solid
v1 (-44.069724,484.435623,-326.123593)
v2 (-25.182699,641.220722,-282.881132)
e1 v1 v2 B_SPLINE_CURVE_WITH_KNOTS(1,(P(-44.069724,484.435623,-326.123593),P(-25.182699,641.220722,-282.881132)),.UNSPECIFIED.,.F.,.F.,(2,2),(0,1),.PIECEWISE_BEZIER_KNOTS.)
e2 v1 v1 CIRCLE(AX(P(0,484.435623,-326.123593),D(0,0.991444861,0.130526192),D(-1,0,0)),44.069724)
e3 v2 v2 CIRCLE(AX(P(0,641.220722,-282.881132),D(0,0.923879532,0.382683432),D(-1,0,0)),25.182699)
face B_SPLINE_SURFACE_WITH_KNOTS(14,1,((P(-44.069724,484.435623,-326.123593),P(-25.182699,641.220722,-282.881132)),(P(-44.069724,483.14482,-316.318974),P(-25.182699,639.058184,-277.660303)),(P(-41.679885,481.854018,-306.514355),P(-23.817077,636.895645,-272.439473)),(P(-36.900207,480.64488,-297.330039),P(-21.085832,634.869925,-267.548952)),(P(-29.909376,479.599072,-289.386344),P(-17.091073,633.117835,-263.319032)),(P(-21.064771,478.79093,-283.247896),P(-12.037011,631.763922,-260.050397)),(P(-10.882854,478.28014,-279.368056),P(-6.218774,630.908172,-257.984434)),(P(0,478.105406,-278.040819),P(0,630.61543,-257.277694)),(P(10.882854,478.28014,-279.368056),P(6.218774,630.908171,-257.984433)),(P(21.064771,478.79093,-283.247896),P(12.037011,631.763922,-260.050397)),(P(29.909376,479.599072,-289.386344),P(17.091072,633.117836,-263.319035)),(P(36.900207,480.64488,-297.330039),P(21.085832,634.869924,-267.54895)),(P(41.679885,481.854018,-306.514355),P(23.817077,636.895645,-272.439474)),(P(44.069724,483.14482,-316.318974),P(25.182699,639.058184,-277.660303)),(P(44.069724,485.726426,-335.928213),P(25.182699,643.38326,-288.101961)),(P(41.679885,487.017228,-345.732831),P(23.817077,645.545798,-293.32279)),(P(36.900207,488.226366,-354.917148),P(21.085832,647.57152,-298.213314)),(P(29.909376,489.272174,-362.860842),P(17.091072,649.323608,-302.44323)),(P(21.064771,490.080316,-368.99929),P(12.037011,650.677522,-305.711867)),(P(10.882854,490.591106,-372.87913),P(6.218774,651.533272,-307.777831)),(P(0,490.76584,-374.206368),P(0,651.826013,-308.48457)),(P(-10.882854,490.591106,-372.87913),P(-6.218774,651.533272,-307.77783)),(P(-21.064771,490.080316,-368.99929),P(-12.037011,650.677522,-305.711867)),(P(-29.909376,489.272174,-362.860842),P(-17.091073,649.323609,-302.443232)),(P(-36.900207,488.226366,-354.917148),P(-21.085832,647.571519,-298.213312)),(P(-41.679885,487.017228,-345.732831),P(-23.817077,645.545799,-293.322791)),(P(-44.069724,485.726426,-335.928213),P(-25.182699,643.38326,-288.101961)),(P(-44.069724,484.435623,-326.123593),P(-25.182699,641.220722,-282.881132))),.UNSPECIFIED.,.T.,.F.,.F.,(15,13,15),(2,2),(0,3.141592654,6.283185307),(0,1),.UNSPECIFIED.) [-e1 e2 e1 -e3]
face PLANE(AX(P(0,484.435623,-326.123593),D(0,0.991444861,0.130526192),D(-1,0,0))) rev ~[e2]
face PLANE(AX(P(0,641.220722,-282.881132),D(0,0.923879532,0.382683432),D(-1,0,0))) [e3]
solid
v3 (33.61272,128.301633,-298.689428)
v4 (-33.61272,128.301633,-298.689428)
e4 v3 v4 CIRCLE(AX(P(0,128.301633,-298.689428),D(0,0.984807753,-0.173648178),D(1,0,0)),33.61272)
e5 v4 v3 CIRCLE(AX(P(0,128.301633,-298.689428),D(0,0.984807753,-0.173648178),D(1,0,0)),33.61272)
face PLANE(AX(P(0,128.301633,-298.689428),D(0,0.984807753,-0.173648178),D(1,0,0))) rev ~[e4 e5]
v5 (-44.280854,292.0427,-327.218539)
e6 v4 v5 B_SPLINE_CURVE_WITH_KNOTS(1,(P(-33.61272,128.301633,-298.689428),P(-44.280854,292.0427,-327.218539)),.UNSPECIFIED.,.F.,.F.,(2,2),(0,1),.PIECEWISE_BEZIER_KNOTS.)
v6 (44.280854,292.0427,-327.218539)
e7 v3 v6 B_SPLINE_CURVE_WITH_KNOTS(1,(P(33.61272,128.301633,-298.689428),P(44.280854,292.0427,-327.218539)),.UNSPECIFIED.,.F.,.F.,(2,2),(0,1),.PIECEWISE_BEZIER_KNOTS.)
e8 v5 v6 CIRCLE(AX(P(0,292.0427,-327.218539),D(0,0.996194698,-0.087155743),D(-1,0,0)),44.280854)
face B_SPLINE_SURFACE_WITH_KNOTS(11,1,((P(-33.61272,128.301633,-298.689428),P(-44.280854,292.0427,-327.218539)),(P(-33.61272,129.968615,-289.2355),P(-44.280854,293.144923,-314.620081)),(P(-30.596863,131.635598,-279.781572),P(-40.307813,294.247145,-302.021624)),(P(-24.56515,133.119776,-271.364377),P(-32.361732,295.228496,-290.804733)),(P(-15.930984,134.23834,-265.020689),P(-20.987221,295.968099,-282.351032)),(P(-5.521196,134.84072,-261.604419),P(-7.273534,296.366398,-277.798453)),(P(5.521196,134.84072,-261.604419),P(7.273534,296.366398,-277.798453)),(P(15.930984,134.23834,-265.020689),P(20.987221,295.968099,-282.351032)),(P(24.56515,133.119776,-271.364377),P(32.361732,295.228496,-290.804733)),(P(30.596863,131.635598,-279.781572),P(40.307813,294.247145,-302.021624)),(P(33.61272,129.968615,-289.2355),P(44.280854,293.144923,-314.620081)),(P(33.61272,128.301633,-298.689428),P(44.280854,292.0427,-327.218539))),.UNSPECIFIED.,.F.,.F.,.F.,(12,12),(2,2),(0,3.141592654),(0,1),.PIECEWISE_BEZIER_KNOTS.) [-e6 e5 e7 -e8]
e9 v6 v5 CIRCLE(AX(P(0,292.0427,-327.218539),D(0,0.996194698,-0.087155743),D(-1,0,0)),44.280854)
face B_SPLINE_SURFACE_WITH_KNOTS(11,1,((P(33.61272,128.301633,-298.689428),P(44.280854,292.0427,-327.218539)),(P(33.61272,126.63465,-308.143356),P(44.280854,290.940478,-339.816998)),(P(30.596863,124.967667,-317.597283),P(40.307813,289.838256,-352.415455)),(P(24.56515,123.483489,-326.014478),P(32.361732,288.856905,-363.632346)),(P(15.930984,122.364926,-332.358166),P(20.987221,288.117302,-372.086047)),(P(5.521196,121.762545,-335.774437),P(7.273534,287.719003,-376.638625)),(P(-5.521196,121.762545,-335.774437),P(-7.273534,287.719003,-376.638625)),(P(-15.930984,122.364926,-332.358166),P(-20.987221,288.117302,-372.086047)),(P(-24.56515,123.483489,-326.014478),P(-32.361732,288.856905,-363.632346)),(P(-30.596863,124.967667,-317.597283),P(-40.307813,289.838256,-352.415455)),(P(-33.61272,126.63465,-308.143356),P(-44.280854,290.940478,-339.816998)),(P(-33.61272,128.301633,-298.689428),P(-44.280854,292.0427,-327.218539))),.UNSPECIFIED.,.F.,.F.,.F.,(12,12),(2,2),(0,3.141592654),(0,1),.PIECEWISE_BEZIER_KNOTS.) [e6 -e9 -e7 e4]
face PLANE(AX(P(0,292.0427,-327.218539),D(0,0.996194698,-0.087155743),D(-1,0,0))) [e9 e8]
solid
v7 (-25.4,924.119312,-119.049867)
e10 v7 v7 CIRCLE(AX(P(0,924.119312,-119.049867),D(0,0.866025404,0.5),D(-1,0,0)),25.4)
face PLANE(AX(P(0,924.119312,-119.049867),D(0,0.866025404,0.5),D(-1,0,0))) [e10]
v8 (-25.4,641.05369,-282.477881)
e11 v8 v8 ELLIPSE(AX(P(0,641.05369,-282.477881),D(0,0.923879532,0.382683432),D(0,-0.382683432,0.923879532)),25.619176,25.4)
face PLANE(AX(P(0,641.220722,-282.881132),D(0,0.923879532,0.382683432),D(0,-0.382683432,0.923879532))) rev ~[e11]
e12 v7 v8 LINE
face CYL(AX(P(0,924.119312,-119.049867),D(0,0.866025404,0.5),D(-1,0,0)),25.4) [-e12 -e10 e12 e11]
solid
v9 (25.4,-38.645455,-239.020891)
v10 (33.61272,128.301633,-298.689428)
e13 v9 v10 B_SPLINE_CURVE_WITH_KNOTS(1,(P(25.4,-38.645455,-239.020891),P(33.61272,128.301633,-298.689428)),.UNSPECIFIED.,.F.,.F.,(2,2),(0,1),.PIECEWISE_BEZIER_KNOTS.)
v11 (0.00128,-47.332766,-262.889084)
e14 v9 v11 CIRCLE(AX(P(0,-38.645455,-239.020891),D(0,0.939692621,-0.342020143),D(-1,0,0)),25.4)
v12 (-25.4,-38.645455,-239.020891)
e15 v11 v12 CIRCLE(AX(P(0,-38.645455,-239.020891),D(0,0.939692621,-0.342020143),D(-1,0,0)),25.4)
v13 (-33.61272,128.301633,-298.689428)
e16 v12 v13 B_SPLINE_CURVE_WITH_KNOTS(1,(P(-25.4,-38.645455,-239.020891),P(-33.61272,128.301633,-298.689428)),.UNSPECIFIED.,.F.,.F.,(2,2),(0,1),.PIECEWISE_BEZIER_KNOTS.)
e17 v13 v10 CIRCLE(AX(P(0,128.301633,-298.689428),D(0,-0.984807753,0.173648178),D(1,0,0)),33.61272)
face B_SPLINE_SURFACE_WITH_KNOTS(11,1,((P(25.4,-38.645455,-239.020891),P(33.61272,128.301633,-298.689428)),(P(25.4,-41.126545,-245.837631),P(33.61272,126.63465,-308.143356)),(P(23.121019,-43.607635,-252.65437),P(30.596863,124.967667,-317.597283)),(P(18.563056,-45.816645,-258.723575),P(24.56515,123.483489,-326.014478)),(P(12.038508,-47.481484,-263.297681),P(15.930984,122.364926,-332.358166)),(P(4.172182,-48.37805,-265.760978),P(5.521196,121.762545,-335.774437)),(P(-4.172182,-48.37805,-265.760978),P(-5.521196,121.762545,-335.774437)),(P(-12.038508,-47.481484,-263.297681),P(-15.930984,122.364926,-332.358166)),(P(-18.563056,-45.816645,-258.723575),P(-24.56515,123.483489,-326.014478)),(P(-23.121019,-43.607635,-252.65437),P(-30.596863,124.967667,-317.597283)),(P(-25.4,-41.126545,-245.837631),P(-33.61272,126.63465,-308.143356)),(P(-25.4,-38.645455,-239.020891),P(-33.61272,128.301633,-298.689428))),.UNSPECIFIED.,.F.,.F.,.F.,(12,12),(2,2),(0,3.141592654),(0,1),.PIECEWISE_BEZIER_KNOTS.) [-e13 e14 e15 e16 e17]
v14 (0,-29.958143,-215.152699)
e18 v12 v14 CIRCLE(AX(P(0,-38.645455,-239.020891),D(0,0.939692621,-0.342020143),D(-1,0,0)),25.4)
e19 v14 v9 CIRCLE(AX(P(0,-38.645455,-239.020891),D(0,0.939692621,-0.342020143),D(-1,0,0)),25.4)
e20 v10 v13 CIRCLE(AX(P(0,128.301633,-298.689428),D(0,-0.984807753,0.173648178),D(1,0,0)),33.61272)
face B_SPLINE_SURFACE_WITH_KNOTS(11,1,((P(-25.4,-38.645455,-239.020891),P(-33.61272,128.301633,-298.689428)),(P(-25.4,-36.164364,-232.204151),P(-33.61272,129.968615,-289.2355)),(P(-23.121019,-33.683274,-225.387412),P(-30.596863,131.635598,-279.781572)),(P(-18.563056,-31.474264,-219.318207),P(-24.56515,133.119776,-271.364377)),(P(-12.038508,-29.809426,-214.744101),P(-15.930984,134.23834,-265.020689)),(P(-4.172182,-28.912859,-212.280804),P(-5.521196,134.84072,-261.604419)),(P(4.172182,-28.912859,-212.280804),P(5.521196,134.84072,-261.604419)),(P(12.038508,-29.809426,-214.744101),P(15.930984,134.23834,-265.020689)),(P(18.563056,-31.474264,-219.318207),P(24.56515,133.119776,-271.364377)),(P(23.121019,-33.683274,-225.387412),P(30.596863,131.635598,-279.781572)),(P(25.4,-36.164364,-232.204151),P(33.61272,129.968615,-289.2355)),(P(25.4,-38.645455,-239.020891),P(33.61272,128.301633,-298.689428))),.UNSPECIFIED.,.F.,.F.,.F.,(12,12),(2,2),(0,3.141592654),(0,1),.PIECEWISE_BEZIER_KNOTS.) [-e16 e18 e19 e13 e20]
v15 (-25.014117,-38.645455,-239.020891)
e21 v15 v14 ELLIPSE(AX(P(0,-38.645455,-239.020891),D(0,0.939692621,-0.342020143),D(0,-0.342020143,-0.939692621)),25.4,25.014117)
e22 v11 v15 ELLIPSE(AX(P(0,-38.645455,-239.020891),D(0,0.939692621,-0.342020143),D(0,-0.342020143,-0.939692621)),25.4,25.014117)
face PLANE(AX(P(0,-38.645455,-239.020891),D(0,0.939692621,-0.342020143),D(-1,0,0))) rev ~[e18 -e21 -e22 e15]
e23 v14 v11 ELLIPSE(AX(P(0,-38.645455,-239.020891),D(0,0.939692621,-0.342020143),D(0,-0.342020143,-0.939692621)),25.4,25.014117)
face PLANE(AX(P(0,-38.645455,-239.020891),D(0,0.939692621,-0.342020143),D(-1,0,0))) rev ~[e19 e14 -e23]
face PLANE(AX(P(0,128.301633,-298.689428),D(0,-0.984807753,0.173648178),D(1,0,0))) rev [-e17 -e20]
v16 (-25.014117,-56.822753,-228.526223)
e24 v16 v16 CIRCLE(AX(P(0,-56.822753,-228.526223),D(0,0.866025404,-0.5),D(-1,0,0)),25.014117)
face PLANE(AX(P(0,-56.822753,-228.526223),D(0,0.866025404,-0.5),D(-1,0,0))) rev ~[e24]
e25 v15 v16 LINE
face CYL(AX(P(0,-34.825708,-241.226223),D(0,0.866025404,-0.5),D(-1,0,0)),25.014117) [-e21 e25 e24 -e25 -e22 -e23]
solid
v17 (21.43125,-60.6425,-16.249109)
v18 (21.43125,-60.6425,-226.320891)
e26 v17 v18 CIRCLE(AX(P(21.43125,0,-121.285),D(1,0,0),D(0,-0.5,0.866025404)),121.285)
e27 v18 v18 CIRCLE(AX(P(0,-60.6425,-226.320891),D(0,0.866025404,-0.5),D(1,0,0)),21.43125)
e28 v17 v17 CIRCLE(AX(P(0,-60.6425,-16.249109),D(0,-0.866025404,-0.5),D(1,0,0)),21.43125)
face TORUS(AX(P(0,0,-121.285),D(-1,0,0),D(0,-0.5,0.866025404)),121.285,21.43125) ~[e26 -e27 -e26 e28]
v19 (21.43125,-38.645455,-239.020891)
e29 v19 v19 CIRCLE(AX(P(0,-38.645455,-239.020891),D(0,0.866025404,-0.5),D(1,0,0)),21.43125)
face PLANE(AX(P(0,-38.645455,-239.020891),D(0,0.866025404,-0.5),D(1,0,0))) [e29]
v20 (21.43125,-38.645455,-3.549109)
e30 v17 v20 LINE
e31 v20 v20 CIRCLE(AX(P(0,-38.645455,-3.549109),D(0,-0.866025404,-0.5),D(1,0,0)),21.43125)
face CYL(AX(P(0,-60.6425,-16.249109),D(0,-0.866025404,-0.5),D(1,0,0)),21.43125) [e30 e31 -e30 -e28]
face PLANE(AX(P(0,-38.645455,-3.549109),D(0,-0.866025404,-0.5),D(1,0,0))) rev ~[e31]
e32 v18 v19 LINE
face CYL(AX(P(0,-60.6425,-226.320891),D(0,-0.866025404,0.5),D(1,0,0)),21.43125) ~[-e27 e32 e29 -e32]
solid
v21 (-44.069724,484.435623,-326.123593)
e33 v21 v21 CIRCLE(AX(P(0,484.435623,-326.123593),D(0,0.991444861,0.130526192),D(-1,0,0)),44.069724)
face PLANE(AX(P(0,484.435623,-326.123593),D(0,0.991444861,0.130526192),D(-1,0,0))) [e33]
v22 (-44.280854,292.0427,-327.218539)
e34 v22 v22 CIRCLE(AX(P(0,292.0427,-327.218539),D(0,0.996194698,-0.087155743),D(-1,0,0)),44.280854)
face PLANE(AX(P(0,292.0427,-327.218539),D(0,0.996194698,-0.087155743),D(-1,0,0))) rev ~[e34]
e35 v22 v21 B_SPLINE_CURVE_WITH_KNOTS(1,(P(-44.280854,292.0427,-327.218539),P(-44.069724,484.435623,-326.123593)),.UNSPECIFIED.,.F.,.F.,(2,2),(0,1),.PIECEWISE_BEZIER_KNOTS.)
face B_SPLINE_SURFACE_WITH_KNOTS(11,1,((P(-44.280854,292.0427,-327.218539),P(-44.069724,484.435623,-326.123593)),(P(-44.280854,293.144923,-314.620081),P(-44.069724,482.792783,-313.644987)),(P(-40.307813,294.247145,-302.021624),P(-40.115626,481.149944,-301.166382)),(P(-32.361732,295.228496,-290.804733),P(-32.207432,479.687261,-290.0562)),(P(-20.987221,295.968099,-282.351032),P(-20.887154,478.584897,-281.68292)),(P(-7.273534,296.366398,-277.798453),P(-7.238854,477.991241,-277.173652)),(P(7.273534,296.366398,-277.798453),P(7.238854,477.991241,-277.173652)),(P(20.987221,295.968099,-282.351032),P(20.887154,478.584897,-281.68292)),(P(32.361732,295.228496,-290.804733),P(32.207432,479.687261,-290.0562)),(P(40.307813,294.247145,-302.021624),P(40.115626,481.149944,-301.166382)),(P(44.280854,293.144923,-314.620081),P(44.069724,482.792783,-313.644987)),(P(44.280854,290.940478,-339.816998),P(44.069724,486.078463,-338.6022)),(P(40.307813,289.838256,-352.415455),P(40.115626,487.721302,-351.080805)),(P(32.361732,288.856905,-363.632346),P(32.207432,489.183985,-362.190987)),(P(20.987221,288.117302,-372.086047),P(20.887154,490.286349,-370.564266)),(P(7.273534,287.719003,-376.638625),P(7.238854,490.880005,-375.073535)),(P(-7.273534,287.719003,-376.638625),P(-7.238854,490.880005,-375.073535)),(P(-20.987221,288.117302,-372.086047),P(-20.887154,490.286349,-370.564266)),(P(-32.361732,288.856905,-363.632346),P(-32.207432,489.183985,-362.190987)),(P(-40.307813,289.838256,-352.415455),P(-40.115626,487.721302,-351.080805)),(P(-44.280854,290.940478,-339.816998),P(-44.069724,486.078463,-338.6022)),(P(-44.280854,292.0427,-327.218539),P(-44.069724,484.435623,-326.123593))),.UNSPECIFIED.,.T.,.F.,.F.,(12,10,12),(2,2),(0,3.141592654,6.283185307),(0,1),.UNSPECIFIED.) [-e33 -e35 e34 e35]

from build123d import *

# Parameters (mm, degrees)
F1_ANGLE_START = 30
F1_ANGLE       = 120
F2_DEPTH       = 25.4
F3_DEPTH       = 25.4
F6_R           = 25.0141169265
F7_DEPTH       = 25.4
F9_R           = 25.4
F11_R          = 33.61271962
F14_R          = 44.2808543302
F17_R          = 44.0697240881
F20_R          = 25.1826994789
F23_R          = 25.4
F24_REACH      = 1121.8902596119


with BuildPart() as f1:
    # F0 (on Front) → F1 (revolve)
    with BuildSketch(Plane.XZ, mode=Mode.PRIVATE) as f1_sk:
        with BuildLine():
            ThreePointArc((0, -21.43125), (15.1541822043, -15.1541822043), (21.43125, 0))
            ThreePointArc((21.43125, 0), (-15.1541822043, 15.1541822043), (0, -21.43125))
        make_face()
    revolve(f1_sk.sketch.rotate(Axis((0, 0, -121.285), (1, 0, 0)), F1_ANGLE_START), axis=Axis((0, 0, -121.285), (1, 0, 0)), revolution_arc=F1_ANGLE)

    # F2 (add): a face of the model
    f2_faces = [f1.faces().sort_by_distance(p)[0] for p in [
        (0, -60.6425, -16.249108902),
    ]]
    extrude(f2_faces, amount=F2_DEPTH)

    # F3 (add): a face of the model
    f3_faces = [f1.faces().sort_by_distance(p)[0] for p in [
        (0, -60.6425, -226.320891098),
    ]]
    extrude(f3_faces, amount=F3_DEPTH)


with BuildPart() as f7:
    # F6 (on line) → F7 (new body)
    with BuildSketch(Plane(origin=(0, 78.3347376279, -45.2265818564), x_dir=(-1, 0, 0), z_dir=(0, 0.8660254038, -0.5))):
        with Locations((0, -226.320891098)):
            Circle(F6_R)
    extrude(amount=-F7_DEPTH)

    # F9 (on line) → F12 section 0
    with BuildSketch(Plane(origin=(0, 42.6950383259, -15.5397231015), x_dir=(-1, 0, 0), z_dir=(0, 0.9396926208, -0.3420201433))):
        with Locations((0, -237.8236915488)):
            Circle(F9_R)
    # F11 (on line) → F12 section 1
    with BuildSketch(Plane(origin=(0, 175.5117654441, -30.9474596796), x_dir=(1, 0, 0), z_dir=(0, -0.984807753, 0.1736481777))):
        with Locations((0, -271.8723195376)):
            Circle(F11_R)
    loft()


with BuildPart() as f15:
    # F12_face (on face) → F15 section 0
    with BuildSketch(Plane(origin=(0, 128.3016325983, -298.6894277896), x_dir=(-1, 0, 0), z_dir=(0, 0.984807753, -0.1736481777))):
        with BuildLine():
            ThreePointArc((33.61271962, 0), (0, 33.61271962), (-33.61271962, 0))
            ThreePointArc((-33.61271962, 0), (0, -33.61271962), (33.61271962, 0))
        make_face()
    # F14 (on line) → F15 section 1
    with BuildSketch(Plane(origin=(0, 318.2347595961, -27.8419338046), x_dir=(-1, 0, 0), z_dir=(0, 0.9961946981, -0.0871557427))):
        with Locations((0, -300.5201756507)):
            Circle(F14_R)
    loft()


with BuildPart() as f18:
    # F15_face (on face) → F18 section 0
    with BuildSketch(Plane(origin=(0, 292.0427004766, -327.2185394574), x_dir=(-1, 0, 0), z_dir=(0, 0.9961946981, -0.0871557427))):
        with BuildLine():
            ThreePointArc((-44.2808543302, 0), (0, -44.2808543302), (44.2808543302, 0))
            ThreePointArc((44.2808543302, 0), (0, 44.2808543302), (-44.2808543302, 0))
        make_face()
    # F17 (on line) → F18 section 1
    with BuildSketch(Plane(origin=(0, 433.9787527242, 57.134386696), x_dir=(-1, 0, 0), z_dir=(0, 0.9914448614, 0.1305261922))):
        with Locations((0, -386.5650979544)):
            Circle(F17_R)
    loft()


with BuildPart() as f21:
    # F18_face (on face) → F21 section 0
    with BuildSketch(Plane(origin=(0, 484.4356230054, -326.1235932574), x_dir=(-1, 0, 0), z_dir=(0, 0.9914448614, 0.1305261922))):
        with BuildLine():
            ThreePointArc((-44.0697240881, 0), (0, -44.0697240881), (44.0697240881, 0))
            ThreePointArc((44.0697240881, 0), (0, 44.0697240881), (-44.0697240881, 0))
        make_face()
    # F20 (on line) → F21 section 1
    with BuildSketch(Plane(origin=(0, 447.302537817, 185.2787776477), x_dir=(-1, 0, 0), z_dir=(0, 0.9238795325, 0.3826834324))):
        with Locations((0, -506.7326347527)):
            Circle(F20_R)
    loft()


with BuildPart() as f24:
    f24_end = Plane(origin=(0, 641.2207217755, -282.8811320558), x_dir=(0, -0.3826834324, 0.9238795325), z_dir=(0, 0.9238795325, 0.3826834324))
    # F23 (on line) → F24 (new body, up to a plane its end follows)
    with BuildSketch(Plane(origin=(0, 641.5393792313, 370.3929332949), x_dir=(-1, 0, 0), z_dir=(0, 0.8660254038, 0.5))):
        with Locations((0, -565.1598654933)):
            Circle(F23_R)
    f24_long = extrude(amount=-F24_REACH, mode=Mode.PRIVATE)
    add(split(f24_long, bisect_by=f24_end, keep=Keep.TOP, mode=Mode.PRIVATE))


solid = Compound([f1.part, f7.part, f15.part, f18.part, f21.part, f24.part])
